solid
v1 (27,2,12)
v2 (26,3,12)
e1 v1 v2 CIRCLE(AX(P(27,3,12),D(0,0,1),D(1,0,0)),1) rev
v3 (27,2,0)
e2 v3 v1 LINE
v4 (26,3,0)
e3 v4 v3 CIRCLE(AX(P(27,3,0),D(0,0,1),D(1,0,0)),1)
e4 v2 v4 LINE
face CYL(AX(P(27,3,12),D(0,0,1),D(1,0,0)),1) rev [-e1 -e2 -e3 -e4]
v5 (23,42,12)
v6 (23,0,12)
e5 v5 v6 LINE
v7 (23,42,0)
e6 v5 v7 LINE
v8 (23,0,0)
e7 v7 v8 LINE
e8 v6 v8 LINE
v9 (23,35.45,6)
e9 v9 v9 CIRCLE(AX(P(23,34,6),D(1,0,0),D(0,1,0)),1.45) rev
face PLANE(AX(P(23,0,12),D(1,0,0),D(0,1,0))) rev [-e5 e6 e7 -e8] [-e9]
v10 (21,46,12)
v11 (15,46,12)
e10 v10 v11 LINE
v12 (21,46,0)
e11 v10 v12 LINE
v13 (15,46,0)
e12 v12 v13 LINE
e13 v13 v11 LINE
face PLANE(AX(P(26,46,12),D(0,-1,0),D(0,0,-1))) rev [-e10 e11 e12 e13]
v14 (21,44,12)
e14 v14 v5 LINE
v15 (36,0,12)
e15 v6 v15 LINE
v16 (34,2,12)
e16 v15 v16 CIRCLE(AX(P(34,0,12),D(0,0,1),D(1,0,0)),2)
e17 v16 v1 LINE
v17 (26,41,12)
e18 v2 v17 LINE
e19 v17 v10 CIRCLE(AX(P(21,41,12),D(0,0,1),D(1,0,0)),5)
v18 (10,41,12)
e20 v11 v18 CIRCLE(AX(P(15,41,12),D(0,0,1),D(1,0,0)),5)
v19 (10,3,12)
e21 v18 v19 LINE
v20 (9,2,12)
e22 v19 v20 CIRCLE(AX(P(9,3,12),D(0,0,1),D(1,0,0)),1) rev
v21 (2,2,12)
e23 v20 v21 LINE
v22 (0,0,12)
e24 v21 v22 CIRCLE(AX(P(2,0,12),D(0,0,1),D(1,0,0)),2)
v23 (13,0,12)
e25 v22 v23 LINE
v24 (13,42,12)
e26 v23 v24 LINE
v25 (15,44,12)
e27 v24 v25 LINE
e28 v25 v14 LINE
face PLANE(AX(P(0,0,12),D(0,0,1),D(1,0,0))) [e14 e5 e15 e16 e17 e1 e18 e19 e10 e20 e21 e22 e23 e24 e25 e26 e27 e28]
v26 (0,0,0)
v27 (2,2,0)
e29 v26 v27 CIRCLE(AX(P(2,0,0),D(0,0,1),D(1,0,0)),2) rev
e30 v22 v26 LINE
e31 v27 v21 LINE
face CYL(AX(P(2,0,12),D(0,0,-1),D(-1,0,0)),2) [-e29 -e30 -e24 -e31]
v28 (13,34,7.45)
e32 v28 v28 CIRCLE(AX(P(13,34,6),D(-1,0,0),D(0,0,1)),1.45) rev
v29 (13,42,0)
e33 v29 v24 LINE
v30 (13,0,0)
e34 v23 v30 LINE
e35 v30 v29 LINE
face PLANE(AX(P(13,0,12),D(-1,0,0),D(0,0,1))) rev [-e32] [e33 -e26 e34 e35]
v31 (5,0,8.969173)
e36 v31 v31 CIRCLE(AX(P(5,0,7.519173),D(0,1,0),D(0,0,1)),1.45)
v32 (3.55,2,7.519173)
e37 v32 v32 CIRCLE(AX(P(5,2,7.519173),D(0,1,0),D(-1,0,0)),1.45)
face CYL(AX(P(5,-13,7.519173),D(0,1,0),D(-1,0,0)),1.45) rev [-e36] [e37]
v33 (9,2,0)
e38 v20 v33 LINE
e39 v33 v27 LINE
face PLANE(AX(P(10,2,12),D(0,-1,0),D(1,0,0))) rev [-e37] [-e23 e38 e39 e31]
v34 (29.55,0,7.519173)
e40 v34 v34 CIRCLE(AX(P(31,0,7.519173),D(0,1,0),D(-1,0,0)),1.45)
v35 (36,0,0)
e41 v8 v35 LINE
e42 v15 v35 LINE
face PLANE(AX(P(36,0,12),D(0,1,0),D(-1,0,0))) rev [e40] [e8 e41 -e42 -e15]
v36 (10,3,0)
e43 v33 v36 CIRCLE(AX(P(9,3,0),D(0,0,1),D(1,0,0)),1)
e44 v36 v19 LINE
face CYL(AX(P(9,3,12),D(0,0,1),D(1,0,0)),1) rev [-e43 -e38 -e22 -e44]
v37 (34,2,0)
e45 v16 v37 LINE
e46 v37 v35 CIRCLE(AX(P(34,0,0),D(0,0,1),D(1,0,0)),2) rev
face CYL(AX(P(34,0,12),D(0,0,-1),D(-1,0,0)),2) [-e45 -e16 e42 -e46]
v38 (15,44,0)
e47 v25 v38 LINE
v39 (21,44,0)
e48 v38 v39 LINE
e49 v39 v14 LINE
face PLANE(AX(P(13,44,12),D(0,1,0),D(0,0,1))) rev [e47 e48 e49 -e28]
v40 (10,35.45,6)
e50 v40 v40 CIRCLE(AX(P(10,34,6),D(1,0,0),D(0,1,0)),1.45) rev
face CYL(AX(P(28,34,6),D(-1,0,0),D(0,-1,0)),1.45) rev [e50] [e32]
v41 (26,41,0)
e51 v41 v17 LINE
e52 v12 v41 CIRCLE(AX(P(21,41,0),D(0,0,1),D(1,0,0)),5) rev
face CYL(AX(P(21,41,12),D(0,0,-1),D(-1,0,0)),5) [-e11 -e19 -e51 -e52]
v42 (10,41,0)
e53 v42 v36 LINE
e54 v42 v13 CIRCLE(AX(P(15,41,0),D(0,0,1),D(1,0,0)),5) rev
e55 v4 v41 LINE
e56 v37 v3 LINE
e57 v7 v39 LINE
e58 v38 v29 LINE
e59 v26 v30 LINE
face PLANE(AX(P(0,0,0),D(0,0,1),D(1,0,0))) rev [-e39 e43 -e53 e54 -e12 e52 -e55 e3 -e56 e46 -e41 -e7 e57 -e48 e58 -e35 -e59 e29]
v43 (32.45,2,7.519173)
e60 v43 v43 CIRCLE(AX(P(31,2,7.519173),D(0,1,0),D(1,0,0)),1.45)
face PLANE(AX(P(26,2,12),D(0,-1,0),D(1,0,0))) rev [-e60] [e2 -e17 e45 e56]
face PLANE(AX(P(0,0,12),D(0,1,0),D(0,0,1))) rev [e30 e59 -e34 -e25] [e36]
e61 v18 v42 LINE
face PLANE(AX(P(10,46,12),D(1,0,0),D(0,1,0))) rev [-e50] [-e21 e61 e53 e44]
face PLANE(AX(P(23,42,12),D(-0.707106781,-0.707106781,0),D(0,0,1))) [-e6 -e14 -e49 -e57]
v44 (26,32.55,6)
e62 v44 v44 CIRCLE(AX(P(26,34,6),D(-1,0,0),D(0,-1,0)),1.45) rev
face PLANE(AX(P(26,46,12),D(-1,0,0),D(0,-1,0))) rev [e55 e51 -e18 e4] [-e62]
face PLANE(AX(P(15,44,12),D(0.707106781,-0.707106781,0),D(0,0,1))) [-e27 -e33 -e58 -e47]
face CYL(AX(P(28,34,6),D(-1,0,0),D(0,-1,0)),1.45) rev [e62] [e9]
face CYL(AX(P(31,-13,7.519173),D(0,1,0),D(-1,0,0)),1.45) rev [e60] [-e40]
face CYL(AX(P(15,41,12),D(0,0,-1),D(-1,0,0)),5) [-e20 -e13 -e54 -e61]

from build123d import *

# Parameters (mm, degrees)
EXTRUDE_1_DEPTH          = 12
CUT_EXTRUDE_1_DEPTH      = 15
CUT_EXTRUDE_1_DEPTH_BACK = 15
SKETCH_2_R               = 1.45
SKETCH_3_R               = 1.45
CUT_EXTRUDE_2_DEPTH      = 15
FILLET_1_R               = 1
FILLET_2_R               = 5
FILLET_3_R               = 2
CHAMFER_1_SIZE           = 2


with BuildPart() as part:
    # 草图1 → 凸台-拉伸1 (new body)
    with BuildSketch(Plane.XY):
        Polygon((0, 0), (13, 0), (13, 44), (23, 44), (23, 0), (36, 0), (36, 2), (26, 2), (26, 46), (10, 46), (10, 2), (0, 2), align=None)
    extrude(amount=EXTRUDE_1_DEPTH)

    # 草图2 → 切除-拉伸1 (cut, two sides: drawn at the far end of the back side and taken through both)
    with BuildSketch(Plane(origin=(13, 0, 0), x_dir=(0, 0, -1), z_dir=(1, 0, 0)).offset(-CUT_EXTRUDE_1_DEPTH_BACK)):
        with Locations(Location((-6, 34, 0), (0, 0, 180))):
            Circle(SKETCH_2_R)
    extrude(amount=CUT_EXTRUDE_1_DEPTH + CUT_EXTRUDE_1_DEPTH_BACK, mode=Mode.SUBTRACT)

    # 草图3 → 切除-拉伸2 (cut)
    with BuildSketch(Plane(origin=(0, 2, 0), x_dir=(1, 0, 0), z_dir=(0, 1, 0))):
        with Locations(Location((5, -7.519173445, 0), (0, 0, 180))):
            Circle(SKETCH_3_R)
        with Locations(Location((31, -7.519173445, 0), (0, 0, 180))):
            Circle(SKETCH_3_R)
    extrude(amount=-CUT_EXTRUDE_2_DEPTH, mode=Mode.SUBTRACT)

    # 圆角1
    fillet_1_edges = [part.edges().sort_by_distance(p)[0] for p in [
        (10, 2, 6),
        (26, 2, 6),
    ]]
    fillet(fillet_1_edges, radius=FILLET_1_R)

    # 圆角2
    fillet_2_edges = [part.edges().sort_by_distance(p)[0] for p in [
        (10, 46, 6),
        (26, 46, 6),
    ]]
    fillet(fillet_2_edges, radius=FILLET_2_R)

    # 圆角3
    fillet_3_edges = [part.edges().sort_by_distance(p)[0] for p in [
        (36, 2, 6),
        (0, 2, 6),
    ]]
    fillet(fillet_3_edges, radius=FILLET_3_R - 0.0001)  # a hair under: the kernel refuses the full size

    # 倒角1
    chamfer_1_edges = [part.edges().sort_by_distance(p)[0] for p in [
        (23, 44, 6),
        (13, 44, 6),
    ]]
    chamfer(chamfer_1_edges, length=CHAMFER_1_SIZE)


solid = part.part
